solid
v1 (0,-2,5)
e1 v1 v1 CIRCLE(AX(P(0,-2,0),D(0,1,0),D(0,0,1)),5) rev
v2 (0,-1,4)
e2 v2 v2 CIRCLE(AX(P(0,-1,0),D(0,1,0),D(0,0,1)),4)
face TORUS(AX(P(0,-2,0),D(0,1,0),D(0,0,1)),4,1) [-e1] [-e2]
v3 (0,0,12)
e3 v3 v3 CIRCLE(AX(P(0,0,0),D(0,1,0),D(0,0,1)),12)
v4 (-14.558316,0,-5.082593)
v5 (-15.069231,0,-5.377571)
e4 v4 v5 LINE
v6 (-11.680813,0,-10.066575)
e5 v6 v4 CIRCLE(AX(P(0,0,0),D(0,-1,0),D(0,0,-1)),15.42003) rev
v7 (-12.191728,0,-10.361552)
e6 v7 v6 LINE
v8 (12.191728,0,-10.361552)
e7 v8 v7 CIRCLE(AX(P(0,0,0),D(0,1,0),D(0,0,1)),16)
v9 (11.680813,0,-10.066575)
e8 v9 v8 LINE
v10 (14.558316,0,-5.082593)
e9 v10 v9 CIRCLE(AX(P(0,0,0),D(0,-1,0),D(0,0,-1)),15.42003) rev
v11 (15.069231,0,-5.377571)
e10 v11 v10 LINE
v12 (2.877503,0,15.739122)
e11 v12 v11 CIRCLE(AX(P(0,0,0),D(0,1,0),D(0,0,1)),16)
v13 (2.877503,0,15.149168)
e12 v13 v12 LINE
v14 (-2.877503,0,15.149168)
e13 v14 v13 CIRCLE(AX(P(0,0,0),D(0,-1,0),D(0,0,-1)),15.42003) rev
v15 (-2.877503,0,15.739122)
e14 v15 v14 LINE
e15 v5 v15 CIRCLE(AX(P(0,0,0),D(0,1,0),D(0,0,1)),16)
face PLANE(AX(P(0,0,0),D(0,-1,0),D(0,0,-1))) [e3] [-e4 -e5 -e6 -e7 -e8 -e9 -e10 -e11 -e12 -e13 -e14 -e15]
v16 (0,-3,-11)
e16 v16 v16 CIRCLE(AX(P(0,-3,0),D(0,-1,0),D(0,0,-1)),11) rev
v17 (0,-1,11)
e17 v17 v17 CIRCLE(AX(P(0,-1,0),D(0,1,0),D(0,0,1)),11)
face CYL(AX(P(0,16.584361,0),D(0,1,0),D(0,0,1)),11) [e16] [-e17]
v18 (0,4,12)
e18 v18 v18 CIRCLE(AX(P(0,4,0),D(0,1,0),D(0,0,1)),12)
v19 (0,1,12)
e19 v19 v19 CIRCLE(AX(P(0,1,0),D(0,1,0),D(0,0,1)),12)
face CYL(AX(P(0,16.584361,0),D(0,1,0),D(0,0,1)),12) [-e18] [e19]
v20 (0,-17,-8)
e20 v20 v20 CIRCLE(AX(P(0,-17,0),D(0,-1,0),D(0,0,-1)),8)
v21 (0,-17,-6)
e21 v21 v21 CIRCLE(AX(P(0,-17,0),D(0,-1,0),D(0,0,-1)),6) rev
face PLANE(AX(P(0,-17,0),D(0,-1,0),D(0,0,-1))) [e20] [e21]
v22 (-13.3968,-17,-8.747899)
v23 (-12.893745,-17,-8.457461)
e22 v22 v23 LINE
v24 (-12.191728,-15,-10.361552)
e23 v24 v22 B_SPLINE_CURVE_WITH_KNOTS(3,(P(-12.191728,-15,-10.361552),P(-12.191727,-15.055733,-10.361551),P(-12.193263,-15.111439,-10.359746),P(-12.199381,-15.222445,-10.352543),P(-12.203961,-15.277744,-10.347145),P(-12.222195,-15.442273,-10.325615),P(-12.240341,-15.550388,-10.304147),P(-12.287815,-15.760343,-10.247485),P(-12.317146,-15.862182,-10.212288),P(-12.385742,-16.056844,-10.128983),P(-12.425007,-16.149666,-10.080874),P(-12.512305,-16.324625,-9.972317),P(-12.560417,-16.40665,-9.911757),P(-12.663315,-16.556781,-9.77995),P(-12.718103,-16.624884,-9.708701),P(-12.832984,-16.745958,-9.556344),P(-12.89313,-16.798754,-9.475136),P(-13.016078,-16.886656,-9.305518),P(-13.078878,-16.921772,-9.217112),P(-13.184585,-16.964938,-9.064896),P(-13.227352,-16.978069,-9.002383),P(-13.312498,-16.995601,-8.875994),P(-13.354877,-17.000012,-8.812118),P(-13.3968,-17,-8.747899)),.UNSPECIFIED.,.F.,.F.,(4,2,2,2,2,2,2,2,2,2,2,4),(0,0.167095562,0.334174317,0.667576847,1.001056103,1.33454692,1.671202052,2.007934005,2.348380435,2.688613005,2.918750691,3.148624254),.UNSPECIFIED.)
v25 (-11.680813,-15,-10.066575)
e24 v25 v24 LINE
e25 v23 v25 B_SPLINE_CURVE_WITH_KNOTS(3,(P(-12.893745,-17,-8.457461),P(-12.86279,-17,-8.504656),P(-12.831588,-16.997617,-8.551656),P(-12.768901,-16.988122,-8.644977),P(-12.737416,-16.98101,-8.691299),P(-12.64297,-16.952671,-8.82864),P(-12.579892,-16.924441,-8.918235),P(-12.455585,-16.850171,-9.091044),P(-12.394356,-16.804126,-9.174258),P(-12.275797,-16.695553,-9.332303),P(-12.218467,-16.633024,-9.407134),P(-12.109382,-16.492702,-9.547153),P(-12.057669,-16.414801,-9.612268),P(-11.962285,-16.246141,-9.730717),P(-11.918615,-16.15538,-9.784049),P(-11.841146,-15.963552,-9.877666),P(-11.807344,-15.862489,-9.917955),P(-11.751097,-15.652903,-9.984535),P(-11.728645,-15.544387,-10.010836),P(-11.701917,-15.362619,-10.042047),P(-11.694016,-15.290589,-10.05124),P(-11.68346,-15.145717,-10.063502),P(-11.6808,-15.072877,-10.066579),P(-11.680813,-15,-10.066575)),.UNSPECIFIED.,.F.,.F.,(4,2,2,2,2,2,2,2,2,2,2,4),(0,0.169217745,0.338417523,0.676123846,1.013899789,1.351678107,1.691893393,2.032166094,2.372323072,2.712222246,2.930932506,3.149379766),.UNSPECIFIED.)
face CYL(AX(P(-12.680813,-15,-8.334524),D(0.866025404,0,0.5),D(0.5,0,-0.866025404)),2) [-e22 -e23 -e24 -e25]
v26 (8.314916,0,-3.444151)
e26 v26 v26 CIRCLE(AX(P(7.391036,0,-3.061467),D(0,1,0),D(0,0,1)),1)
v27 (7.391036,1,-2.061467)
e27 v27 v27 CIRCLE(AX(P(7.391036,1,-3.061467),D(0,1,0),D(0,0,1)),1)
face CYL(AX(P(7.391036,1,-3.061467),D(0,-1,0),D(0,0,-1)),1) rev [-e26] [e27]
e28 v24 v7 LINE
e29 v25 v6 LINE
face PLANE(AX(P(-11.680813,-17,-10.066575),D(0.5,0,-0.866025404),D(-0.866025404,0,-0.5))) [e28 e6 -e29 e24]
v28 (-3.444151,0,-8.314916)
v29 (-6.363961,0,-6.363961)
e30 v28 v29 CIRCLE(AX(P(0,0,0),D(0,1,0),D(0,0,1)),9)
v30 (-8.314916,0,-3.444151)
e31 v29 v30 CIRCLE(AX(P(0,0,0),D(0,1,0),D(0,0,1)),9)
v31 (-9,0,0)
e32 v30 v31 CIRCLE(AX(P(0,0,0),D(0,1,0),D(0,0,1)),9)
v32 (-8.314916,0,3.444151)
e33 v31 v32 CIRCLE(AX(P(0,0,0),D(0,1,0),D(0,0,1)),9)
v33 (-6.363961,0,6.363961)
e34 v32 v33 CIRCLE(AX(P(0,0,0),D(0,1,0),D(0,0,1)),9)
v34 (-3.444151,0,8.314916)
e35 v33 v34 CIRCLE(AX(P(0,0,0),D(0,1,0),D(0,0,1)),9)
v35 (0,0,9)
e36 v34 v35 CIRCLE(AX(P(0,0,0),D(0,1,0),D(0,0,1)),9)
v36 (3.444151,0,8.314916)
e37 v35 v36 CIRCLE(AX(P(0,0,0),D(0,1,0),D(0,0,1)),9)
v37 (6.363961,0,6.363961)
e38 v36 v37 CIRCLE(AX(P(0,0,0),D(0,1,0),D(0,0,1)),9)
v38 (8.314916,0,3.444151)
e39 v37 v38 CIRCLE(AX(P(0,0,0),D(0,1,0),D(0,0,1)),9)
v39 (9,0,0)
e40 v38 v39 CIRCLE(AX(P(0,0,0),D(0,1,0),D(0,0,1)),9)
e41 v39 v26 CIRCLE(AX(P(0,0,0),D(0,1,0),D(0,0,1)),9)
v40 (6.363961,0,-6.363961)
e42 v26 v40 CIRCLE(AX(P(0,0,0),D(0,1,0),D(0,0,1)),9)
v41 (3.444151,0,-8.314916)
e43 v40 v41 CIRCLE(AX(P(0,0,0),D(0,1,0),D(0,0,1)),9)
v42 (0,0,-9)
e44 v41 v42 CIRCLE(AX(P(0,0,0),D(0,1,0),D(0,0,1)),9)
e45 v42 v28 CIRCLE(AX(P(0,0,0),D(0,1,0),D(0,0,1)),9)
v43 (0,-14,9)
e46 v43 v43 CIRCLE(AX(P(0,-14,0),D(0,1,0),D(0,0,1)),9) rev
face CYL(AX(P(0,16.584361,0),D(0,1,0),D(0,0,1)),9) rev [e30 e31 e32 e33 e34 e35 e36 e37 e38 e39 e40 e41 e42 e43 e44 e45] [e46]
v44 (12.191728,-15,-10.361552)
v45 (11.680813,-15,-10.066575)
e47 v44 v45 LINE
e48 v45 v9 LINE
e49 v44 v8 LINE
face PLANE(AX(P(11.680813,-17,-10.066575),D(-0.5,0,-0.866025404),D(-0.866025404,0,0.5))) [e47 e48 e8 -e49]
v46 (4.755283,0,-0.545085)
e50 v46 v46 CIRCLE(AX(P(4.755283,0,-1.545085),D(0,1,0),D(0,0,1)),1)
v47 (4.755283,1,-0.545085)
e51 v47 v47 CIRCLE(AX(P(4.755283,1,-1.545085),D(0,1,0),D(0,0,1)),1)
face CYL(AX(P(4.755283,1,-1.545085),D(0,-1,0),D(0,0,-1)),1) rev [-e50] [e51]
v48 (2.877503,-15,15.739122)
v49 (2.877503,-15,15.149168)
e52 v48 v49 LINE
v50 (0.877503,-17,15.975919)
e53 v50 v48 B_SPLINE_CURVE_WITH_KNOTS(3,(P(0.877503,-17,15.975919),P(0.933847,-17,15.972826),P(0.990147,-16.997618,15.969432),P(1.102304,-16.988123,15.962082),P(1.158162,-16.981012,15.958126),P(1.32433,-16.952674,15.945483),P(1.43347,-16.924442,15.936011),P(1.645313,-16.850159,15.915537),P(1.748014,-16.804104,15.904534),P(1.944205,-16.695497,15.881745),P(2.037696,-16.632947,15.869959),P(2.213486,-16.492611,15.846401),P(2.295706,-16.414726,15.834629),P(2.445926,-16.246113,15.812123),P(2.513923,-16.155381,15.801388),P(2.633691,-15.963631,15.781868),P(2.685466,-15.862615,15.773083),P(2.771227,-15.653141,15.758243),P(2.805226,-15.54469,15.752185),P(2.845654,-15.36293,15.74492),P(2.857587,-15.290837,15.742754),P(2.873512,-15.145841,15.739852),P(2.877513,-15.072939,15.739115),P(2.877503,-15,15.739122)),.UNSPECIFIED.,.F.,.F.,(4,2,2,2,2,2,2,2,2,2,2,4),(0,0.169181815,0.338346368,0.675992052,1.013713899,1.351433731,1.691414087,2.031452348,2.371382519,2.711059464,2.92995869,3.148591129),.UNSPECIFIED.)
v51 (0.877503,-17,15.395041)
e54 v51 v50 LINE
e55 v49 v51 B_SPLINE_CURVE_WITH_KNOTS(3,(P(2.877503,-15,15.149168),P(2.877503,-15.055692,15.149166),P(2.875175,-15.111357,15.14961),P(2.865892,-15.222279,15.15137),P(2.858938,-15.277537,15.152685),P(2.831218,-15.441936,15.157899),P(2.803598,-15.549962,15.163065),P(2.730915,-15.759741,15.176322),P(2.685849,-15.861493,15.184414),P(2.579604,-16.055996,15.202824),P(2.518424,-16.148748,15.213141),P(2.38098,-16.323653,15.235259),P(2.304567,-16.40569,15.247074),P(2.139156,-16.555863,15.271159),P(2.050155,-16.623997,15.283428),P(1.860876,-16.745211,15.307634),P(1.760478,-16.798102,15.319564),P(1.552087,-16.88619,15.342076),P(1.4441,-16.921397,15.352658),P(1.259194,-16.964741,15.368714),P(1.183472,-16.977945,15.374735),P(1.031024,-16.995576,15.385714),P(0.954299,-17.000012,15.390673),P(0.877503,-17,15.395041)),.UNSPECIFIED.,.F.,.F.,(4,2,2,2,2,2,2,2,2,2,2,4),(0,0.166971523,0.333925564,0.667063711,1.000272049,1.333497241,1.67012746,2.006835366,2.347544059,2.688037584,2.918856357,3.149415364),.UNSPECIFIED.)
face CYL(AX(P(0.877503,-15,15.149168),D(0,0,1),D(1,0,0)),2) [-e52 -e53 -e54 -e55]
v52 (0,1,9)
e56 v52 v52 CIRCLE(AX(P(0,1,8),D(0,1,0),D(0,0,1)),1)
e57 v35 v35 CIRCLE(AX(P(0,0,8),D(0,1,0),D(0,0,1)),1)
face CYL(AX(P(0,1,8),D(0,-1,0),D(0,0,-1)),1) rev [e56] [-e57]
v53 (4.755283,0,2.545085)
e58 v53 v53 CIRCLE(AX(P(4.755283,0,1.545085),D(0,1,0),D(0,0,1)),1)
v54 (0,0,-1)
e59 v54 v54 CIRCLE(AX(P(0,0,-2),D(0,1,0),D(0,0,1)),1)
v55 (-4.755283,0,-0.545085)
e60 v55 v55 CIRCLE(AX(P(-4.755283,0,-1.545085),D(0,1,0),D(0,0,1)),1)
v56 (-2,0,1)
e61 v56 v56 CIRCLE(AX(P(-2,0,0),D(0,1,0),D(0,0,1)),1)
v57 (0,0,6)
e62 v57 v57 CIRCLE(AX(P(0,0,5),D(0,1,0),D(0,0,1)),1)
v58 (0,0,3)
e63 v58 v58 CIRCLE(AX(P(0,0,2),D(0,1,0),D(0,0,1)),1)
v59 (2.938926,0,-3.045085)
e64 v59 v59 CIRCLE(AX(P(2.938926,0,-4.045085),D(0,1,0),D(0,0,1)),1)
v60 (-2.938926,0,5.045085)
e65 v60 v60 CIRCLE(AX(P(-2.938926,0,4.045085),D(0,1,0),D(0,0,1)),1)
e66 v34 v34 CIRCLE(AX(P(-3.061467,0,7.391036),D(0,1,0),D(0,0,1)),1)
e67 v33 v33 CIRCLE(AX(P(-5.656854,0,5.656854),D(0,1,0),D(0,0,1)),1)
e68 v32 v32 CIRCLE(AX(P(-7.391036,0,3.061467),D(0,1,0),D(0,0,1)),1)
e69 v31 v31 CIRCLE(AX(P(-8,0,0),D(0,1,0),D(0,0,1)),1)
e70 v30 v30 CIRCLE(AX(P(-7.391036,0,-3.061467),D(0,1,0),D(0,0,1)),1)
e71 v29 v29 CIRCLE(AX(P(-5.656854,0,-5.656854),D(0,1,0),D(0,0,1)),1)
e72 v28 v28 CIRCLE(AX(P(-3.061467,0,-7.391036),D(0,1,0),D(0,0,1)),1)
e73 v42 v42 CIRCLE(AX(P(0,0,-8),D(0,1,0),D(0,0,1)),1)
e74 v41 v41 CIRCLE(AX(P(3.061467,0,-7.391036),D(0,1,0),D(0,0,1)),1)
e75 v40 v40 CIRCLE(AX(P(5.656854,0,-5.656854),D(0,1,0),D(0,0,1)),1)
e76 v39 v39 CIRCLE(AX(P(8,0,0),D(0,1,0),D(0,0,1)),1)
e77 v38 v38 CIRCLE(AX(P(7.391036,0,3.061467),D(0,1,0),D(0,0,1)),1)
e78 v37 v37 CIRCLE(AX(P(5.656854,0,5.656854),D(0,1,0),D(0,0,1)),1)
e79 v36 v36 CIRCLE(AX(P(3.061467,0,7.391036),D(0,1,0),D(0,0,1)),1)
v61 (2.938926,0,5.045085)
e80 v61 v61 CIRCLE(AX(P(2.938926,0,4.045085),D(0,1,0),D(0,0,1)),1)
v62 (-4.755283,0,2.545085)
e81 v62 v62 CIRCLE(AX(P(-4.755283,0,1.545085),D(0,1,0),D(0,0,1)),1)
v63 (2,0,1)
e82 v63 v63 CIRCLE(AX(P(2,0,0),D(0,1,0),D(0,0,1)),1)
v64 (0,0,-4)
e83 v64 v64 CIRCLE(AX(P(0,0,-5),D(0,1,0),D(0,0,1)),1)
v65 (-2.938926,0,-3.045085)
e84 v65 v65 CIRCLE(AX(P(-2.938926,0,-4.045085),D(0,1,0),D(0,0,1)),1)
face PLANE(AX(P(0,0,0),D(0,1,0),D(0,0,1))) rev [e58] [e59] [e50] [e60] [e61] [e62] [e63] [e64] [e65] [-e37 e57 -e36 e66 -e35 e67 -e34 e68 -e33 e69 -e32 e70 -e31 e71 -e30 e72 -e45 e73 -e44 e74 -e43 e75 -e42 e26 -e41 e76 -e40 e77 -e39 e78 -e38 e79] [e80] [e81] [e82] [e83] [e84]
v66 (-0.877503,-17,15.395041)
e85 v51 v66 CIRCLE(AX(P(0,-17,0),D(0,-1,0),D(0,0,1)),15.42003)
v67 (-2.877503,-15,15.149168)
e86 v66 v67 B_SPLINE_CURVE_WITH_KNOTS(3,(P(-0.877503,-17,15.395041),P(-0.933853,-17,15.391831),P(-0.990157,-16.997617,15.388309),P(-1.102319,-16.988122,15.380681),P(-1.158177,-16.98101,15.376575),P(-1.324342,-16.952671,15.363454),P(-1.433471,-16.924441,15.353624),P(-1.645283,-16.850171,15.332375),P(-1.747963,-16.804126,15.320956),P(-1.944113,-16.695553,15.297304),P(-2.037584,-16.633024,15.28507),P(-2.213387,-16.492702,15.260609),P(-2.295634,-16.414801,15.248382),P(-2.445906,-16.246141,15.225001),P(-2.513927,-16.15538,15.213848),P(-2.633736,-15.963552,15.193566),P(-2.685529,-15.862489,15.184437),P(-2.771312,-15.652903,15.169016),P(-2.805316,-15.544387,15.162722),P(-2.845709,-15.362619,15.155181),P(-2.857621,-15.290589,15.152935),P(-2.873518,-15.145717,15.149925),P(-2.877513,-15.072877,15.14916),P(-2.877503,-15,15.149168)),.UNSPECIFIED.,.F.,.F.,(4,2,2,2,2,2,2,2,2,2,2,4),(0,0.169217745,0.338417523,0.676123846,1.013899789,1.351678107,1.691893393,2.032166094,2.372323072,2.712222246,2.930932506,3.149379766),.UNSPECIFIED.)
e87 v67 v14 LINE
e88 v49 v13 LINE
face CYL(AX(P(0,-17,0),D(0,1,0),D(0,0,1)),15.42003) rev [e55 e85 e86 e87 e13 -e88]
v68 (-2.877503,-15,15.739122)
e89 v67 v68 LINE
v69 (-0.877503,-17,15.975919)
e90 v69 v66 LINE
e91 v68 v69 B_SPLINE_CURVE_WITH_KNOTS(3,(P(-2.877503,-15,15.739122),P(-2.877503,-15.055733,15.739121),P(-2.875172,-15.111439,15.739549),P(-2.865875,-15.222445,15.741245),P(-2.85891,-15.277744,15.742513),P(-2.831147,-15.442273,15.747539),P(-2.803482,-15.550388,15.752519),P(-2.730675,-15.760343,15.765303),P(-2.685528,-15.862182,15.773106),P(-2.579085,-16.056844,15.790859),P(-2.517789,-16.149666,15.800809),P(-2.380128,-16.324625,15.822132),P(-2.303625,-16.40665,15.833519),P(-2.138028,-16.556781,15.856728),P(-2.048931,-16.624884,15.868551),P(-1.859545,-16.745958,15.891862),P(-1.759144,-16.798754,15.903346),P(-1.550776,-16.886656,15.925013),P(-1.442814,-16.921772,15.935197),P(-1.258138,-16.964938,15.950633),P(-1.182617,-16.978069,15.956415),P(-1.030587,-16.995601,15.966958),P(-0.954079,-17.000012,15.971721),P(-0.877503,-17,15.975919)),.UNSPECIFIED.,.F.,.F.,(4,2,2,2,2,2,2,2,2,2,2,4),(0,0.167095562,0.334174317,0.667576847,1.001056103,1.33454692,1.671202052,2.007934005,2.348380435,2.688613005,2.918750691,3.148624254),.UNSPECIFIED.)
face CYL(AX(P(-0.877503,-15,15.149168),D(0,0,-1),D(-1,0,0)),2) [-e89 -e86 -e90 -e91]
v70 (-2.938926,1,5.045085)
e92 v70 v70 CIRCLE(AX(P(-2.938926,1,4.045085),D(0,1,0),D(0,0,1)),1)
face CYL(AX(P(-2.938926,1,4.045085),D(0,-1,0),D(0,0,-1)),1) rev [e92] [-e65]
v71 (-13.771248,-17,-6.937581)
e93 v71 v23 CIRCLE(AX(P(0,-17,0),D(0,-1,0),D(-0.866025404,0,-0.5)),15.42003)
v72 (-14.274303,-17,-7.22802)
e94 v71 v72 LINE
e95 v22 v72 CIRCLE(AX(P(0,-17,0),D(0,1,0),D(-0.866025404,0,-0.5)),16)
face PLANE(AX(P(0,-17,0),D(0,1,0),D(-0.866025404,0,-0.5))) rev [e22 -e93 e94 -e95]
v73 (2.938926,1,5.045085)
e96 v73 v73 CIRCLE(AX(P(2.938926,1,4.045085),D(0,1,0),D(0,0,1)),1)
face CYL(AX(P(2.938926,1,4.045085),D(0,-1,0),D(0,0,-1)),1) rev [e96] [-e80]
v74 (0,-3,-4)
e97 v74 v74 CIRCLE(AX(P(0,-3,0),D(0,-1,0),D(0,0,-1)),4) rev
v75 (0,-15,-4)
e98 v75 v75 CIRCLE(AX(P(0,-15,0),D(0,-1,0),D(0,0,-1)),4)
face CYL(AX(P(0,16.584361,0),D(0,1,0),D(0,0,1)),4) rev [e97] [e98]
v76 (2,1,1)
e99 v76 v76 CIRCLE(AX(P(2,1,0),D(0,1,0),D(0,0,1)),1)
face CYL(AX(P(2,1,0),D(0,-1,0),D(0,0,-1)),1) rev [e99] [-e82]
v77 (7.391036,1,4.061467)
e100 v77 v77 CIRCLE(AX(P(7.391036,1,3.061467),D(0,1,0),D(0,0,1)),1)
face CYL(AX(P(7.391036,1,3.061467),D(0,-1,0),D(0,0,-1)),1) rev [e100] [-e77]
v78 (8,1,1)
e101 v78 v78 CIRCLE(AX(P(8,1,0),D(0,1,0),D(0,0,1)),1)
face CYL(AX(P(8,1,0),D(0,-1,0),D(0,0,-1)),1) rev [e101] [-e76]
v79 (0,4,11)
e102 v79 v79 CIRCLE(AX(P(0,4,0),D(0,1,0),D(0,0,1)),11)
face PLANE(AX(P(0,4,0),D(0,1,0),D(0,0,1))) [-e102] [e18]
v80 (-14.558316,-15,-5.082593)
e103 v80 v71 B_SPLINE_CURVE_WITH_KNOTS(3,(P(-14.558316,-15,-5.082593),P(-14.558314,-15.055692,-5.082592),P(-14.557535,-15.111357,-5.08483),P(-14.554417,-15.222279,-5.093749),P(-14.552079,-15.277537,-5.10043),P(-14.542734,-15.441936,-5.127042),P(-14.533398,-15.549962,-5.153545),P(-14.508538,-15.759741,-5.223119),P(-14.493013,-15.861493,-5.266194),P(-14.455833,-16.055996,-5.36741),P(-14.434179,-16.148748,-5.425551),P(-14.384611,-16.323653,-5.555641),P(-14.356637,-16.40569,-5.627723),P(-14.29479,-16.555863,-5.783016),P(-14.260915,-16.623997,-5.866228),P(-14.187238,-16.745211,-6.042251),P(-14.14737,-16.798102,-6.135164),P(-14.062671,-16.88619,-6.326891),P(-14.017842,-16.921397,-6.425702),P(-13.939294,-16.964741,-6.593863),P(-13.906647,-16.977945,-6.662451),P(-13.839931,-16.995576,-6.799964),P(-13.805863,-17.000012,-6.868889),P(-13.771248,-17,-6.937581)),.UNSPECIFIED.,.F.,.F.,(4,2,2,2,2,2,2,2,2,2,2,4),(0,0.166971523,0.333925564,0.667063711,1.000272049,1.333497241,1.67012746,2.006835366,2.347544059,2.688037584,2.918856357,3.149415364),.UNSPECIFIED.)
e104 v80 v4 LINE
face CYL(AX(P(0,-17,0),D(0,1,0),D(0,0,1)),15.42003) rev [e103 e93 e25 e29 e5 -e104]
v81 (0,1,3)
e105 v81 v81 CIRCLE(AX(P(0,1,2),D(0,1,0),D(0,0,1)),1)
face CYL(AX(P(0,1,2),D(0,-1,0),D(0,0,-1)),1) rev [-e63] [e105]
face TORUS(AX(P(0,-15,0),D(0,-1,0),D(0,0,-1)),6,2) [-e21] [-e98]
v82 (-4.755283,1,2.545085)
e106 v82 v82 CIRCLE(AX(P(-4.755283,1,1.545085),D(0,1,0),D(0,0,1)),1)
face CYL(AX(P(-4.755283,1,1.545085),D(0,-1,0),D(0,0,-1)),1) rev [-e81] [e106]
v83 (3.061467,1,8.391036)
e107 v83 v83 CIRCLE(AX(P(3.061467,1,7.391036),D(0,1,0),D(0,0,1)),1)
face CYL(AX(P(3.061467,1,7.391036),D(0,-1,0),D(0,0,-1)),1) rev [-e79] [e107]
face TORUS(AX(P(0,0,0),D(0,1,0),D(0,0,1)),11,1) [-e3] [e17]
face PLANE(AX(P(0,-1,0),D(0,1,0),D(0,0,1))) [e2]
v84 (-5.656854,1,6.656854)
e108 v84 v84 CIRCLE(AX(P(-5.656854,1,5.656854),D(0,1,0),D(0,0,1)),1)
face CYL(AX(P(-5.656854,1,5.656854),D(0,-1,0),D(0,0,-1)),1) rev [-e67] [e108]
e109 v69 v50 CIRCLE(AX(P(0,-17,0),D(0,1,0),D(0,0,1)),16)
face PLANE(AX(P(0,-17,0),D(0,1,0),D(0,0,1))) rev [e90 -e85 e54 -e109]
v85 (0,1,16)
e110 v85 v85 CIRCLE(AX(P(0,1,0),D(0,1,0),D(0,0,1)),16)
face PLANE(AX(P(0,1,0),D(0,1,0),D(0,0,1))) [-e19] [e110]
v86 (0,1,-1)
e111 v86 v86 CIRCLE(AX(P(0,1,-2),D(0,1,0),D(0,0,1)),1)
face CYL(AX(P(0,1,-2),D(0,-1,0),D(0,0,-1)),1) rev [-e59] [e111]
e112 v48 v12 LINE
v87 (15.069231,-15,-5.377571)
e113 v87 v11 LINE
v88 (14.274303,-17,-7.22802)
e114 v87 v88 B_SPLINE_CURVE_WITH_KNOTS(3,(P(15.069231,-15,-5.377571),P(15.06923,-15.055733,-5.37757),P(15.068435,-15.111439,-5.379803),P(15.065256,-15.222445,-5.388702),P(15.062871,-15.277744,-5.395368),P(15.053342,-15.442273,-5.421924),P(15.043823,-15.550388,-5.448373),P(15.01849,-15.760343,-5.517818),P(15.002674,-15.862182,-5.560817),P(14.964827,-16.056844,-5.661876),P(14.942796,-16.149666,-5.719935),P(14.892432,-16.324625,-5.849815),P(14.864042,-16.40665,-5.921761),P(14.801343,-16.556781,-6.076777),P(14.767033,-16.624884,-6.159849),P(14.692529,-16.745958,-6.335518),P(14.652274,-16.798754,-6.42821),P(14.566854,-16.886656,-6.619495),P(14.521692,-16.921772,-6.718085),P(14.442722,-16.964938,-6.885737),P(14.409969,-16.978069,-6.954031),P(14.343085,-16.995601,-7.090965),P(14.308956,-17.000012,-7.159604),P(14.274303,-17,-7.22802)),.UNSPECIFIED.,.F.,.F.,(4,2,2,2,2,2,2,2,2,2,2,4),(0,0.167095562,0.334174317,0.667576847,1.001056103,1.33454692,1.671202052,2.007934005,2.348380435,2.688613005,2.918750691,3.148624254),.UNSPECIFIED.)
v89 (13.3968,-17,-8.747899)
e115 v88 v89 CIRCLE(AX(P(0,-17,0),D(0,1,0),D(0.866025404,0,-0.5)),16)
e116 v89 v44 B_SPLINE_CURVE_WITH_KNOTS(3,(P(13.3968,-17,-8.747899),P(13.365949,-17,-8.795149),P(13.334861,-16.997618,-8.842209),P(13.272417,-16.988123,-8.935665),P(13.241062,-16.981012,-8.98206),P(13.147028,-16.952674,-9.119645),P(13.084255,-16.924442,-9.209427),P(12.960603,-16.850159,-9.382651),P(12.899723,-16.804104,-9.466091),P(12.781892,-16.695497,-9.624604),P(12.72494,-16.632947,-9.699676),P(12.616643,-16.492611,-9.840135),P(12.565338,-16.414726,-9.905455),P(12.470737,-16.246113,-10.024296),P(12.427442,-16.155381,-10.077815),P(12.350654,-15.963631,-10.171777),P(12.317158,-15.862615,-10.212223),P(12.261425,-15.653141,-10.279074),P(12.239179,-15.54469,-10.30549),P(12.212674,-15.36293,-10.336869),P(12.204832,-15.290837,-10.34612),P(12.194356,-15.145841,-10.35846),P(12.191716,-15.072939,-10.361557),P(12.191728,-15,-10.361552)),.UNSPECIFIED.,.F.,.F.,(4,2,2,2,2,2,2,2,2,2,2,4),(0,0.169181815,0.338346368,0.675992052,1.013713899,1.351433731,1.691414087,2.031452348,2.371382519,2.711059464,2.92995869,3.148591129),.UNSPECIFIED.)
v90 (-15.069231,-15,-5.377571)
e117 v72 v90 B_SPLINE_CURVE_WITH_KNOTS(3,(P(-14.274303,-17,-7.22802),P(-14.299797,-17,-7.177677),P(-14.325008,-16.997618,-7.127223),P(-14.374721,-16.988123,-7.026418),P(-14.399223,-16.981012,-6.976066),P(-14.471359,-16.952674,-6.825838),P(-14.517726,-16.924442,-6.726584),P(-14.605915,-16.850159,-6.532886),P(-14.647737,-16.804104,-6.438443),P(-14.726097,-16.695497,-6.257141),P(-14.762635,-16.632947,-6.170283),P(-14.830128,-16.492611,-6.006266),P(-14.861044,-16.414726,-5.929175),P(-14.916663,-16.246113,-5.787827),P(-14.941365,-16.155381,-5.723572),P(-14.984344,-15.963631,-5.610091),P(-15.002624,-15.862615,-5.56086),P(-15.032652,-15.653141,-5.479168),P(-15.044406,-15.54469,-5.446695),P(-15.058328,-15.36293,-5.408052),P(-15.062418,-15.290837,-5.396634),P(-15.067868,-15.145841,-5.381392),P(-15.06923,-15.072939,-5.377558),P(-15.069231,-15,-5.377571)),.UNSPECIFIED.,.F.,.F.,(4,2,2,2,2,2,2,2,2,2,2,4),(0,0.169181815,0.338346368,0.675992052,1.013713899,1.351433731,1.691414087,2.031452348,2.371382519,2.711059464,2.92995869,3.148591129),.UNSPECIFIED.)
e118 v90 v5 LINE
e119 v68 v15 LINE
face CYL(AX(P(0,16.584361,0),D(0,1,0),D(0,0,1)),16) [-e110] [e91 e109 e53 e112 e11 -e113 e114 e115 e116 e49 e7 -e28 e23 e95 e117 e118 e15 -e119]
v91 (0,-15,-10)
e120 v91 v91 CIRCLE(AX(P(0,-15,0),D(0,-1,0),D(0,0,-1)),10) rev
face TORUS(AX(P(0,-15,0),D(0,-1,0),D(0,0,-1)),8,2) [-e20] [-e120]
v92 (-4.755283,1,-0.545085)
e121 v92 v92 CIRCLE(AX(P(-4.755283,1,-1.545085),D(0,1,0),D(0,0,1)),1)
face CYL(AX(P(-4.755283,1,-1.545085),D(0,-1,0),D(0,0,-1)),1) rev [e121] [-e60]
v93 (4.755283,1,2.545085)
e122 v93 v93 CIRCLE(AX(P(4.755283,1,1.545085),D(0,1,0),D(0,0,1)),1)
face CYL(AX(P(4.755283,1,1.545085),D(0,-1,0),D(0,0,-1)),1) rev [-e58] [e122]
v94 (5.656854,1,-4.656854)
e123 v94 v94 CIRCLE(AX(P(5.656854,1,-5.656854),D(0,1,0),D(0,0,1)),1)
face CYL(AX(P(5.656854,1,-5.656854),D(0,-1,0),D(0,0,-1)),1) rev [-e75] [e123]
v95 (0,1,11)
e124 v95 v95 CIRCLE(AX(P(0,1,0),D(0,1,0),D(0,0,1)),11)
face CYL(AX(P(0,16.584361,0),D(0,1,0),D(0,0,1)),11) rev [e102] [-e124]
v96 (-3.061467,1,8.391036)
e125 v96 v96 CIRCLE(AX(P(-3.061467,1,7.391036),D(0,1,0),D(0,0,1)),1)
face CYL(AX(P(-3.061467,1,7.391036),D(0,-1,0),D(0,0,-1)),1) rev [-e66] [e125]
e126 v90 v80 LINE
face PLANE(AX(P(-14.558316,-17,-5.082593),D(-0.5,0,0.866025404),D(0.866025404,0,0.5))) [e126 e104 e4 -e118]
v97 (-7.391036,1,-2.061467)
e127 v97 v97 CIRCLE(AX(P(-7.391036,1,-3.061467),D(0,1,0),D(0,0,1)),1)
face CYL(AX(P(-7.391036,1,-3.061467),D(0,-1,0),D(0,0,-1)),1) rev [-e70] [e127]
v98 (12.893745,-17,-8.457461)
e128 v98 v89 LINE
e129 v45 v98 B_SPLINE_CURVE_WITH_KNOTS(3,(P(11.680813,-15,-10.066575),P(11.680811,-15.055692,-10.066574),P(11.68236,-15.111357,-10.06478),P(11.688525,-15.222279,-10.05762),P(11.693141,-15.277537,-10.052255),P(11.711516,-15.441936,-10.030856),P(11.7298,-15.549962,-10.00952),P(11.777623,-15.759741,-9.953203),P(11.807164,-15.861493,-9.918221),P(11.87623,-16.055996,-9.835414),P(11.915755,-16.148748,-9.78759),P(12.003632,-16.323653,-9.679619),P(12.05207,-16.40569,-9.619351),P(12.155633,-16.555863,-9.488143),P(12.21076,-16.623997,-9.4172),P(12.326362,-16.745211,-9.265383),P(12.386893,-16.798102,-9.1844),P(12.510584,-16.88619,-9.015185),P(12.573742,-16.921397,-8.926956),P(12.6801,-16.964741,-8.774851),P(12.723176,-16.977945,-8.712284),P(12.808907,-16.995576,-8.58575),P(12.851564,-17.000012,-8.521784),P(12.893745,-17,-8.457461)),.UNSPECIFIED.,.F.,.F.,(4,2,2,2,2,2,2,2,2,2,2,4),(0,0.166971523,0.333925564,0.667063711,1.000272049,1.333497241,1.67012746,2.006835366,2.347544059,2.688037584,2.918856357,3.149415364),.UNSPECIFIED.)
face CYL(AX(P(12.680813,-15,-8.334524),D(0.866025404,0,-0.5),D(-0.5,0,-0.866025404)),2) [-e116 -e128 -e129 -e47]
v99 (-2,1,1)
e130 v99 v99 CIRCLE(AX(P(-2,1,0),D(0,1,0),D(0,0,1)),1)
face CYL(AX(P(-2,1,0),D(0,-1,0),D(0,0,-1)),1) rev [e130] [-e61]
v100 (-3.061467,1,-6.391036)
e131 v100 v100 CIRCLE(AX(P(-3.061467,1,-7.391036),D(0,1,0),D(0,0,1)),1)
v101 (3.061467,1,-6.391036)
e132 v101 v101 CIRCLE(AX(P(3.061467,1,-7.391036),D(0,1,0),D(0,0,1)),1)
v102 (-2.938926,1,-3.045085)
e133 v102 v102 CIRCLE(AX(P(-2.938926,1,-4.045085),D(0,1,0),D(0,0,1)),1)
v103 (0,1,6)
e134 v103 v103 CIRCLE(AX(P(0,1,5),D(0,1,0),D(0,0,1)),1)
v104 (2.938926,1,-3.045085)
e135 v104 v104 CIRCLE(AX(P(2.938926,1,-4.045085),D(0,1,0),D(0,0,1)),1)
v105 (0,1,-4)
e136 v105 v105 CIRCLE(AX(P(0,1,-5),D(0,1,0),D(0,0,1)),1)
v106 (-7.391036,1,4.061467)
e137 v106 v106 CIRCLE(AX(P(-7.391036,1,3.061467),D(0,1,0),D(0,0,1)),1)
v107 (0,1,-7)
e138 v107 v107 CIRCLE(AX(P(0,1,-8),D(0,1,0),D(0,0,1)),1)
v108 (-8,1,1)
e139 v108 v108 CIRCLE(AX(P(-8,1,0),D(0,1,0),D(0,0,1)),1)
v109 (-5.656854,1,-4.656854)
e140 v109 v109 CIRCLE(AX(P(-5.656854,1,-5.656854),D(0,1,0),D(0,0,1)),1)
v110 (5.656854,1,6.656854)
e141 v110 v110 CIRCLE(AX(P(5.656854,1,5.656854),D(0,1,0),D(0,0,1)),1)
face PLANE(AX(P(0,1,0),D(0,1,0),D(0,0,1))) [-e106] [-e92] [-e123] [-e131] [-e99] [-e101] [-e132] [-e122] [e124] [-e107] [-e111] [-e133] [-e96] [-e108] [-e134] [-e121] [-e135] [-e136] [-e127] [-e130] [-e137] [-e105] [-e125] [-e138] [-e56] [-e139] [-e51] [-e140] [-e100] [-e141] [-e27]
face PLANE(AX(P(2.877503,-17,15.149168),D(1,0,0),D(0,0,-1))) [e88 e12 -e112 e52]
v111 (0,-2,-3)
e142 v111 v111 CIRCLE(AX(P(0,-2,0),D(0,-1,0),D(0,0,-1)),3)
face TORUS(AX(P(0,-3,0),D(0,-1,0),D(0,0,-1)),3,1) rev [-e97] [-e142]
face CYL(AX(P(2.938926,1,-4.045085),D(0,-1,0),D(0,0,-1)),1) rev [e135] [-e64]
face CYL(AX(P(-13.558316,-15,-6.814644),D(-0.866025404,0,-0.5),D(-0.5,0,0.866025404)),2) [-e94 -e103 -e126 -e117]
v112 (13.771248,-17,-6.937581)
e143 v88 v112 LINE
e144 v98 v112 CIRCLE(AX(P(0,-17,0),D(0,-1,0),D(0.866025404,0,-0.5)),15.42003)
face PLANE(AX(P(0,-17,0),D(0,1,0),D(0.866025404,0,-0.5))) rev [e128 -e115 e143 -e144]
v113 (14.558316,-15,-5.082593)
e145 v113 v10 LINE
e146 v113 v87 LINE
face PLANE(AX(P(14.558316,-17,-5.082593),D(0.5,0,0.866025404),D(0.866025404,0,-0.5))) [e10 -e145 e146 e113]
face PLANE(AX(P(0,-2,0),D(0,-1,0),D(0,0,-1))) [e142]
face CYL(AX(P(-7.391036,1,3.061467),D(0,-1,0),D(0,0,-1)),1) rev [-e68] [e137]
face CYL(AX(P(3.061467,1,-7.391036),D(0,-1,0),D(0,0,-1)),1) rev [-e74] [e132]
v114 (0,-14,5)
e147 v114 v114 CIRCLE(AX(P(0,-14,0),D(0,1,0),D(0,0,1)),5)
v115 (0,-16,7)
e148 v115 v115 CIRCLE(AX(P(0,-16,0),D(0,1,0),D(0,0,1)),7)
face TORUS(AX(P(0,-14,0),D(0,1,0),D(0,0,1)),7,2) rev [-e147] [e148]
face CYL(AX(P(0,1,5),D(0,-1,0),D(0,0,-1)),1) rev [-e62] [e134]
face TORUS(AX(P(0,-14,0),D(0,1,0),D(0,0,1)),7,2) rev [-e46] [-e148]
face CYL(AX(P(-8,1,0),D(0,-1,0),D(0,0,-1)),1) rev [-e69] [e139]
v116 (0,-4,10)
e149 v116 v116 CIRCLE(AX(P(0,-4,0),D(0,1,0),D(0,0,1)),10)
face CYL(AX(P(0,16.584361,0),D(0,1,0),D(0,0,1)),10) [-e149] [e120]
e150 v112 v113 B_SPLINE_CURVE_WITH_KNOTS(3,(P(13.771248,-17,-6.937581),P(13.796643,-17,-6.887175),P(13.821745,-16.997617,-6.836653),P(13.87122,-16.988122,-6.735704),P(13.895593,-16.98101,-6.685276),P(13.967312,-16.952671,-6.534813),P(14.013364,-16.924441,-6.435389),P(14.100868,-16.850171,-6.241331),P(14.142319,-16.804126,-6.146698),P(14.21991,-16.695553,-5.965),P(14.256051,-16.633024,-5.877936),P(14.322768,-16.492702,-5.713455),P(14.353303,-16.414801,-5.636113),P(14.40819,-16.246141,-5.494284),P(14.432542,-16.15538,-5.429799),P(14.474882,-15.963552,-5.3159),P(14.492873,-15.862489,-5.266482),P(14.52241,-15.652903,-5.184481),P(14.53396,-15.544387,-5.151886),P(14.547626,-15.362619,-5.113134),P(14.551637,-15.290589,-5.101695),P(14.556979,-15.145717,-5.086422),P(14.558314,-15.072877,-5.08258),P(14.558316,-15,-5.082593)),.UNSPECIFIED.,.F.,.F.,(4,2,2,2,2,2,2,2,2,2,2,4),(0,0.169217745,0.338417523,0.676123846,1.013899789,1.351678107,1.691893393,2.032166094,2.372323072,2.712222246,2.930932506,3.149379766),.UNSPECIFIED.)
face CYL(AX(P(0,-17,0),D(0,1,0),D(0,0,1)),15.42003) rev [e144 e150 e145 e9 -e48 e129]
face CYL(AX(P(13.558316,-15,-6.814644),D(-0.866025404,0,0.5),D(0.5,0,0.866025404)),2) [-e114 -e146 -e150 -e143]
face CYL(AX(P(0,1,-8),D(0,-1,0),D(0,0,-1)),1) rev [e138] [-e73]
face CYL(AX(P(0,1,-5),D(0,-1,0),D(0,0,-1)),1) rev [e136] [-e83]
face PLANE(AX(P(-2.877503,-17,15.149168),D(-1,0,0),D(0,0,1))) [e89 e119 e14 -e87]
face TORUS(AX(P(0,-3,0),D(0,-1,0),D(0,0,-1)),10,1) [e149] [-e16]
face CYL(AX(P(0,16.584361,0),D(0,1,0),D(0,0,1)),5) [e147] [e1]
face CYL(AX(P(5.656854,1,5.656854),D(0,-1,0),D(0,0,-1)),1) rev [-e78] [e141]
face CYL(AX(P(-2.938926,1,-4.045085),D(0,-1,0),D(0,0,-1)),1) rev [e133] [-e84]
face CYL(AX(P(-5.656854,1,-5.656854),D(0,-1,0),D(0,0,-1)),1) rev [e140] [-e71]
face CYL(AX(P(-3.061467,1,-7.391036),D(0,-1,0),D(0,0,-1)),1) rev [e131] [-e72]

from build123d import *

# Parameters (mm, degrees)
FILLET1_R           = 1
FILLET2_R           = 2
BOSS_EXTRUDE3_DEPTH = 18
SKETCH11_R          = 11
SKETCH11_R_2        = 1
BOSS_EXTRUDE4_DEPTH = 1
CIRPATTERN1_COUNT   = 3
FILLET3_R           = 2


with BuildPart() as part:
    # Sketch1 → Revolve2 (revolve)
    with BuildSketch(Plane.XY, mode=Mode.PRIVATE) as revolve2_sk:
        with BuildLine():
            Line((12, 0), (16, 0))
            Line((16, 0), (16, 1))
            Line((16, 1), (12, 1))
            Line((12, 1), (12, 4))
            Line((12, 4), (11, 4))
            Line((11, 4), (11, 1))
            Line((11, 1), (11, 0))
            Line((11, 0), (9, 0))
            Line((9, 0), (9, -4))
            Line((9, -4), (9, -16))
            Line((9, -16), (5, -16))
            Line((5, -16), (5, -1))
            Line((5, -1), (0, -1))
            Line((0, -1), (0, -2))
            Line((0, -2), (4, -2))
            Line((4, -2), (4, -17))
            Line((4, -17), (10, -17))
            Line((10, -17), (10, -4))
            Line((10, -4), (11, -4))
            Line((11, -4), (11, -1))
            ThreePointArc((11, -1), (11.707107, -0.707107), (12, 0))
        make_face()
    revolve(revolve2_sk.sketch.rotate(Axis((0, 16.584361, 0), (0, -1, 0)), 90), axis=Axis((0, 16.584361, 0), (0, -1, 0)))

    # Fillet1
    fillet1_edges = [part.edges().sort_by_distance(p)[0] for p in [
        (0, -4, -11),
        (0, -2, -4),
        (0, -1, -5),
    ]]
    fillet(fillet1_edges, radius=FILLET1_R - 0.0001)  # a hair under: the kernel refuses the full size

    # Fillet2
    fillet2_edges = [part.edges().sort_by_distance(p)[0] for p in [
        (0, -16, -5),
        (0, -16, -9),
    ]]
    fillet(fillet2_edges, radius=FILLET2_R - 0.0001)  # a hair under: the kernel refuses the full size
    fillet2_2_edges = [part.edges().sort_by_distance(p)[0] for p in [
        (0, -17, -10),
        (0, -17, -4),
    ]]
    fillet(fillet2_2_edges, radius=FILLET2_R)

    # Sketch2 → Boss-Extrude3 (add)
    with BuildSketch(Plane(origin=(0, 1, 0), x_dir=(1, 0, 0), z_dir=(0, 1, 0))):
        with BuildLine():
            Line((-2.877503, -15.149168), (-2.877503, -15.739122))
            ThreePointArc((-2.877503, -15.739122), (0, -16), (2.877503, -15.739122))
            Line((2.877503, -15.739122), (2.877503, -15.149168))
            ThreePointArc((2.877503, -15.149168), (0, -15.42003), (-2.877503, -15.149168))
        make_face()
    boss_extrude3 = extrude(amount=-BOSS_EXTRUDE3_DEPTH)

    # Sketch11 → Boss-Extrude4 (add)
    with BuildSketch(Plane(origin=(0, 0, 0), x_dir=(1, 0, 0), z_dir=(0, 1, 0))):
        with Locations(Location((0, 0, 0), (0, 0, 270))):
            Circle(SKETCH11_R)
        with Locations(Location((0, -2, 0), (0, 0, 270))):
            Circle(SKETCH11_R_2, mode=Mode.SUBTRACT)
        with Locations(Location((0, -5, 0), (0, 0, 270))):
            Circle(SKETCH11_R_2, mode=Mode.SUBTRACT)
        with Locations(Location((0, -8, 0), (0, 0, 269.999141))):
            Circle(SKETCH11_R_2, mode=Mode.SUBTRACT)
        with Locations(Location((-2, 0, 0), (0, 0, 270))):
            Circle(SKETCH11_R_2, mode=Mode.SUBTRACT)
        with Locations(Location((0, 2, 0), (0, 0, 270))):
            Circle(SKETCH11_R_2, mode=Mode.SUBTRACT)
        with Locations(Location((2, 0, 0), (0, 0, 270))):
            Circle(SKETCH11_R_2, mode=Mode.SUBTRACT)
        with Locations(Location((-2.938926, -4.045085, 0), (0, 0, 270))):
            Circle(SKETCH11_R_2, mode=Mode.SUBTRACT)
        with Locations(Location((-4.755283, -1.545085, 0), (0, 0, 270))):
            Circle(SKETCH11_R_2, mode=Mode.SUBTRACT)
        with Locations(Location((-4.755283, 1.545085, 0), (0, 0, 270))):
            Circle(SKETCH11_R_2, mode=Mode.SUBTRACT)
        with Locations(Location((-2.938926, 4.045085, 0), (0, 0, 270))):
            Circle(SKETCH11_R_2, mode=Mode.SUBTRACT)
        with Locations(Location((0, 5, 0), (0, 0, 270))):
            Circle(SKETCH11_R_2, mode=Mode.SUBTRACT)
        with Locations(Location((2.938926, 4.045085, 0), (0, 0, 270))):
            Circle(SKETCH11_R_2, mode=Mode.SUBTRACT)
        with Locations(Location((4.755283, 1.545085, 0), (0, 0, 270))):
            Circle(SKETCH11_R_2, mode=Mode.SUBTRACT)
        with Locations(Location((4.755283, -1.545085, 0), (0, 0, 270))):
            Circle(SKETCH11_R_2, mode=Mode.SUBTRACT)
        with Locations(Location((2.938926, -4.045085, 0), (0, 0, 270))):
            Circle(SKETCH11_R_2, mode=Mode.SUBTRACT)
        with Locations(Location((-3.061467, -7.391036, 0), (0, 0, 247.499141))):
            Circle(SKETCH11_R_2, mode=Mode.SUBTRACT)
        with Locations(Location((-5.656854, -5.656854, 0), (0, 0, 224.999141))):
            Circle(SKETCH11_R_2, mode=Mode.SUBTRACT)
        with Locations(Location((-7.391036, -3.061467, 0), (0, 0, 202.499141))):
            Circle(SKETCH11_R_2, mode=Mode.SUBTRACT)
        with Locations(Location((-8, 0, 0), (0, 0, 179.999141))):
            Circle(SKETCH11_R_2, mode=Mode.SUBTRACT)
        with Locations(Location((-7.391036, 3.061467, 0), (0, 0, 157.499141))):
            Circle(SKETCH11_R_2, mode=Mode.SUBTRACT)
        with Locations(Location((-5.656854, 5.656854, 0), (0, 0, 134.999141))):
            Circle(SKETCH11_R_2, mode=Mode.SUBTRACT)
        with Locations(Location((-3.061467, 7.391036, 0), (0, 0, 112.499141))):
            Circle(SKETCH11_R_2, mode=Mode.SUBTRACT)
        with Locations(Location((0, 8, 0), (0, 0, 89.999141))):
            Circle(SKETCH11_R_2, mode=Mode.SUBTRACT)
        with Locations(Location((3.061467, 7.391036, 0), (0, 0, 67.499141))):
            Circle(SKETCH11_R_2, mode=Mode.SUBTRACT)
        with Locations(Location((5.656854, 5.656854, 0), (0, 0, 44.999141))):
            Circle(SKETCH11_R_2, mode=Mode.SUBTRACT)
        with Locations(Location((7.391036, 3.061467, 0), (0, 0, 22.499141))):
            Circle(SKETCH11_R_2, mode=Mode.SUBTRACT)
        with Locations(Location((8, 0, 0), (0, 0, 359.999141))):
            Circle(SKETCH11_R_2, mode=Mode.SUBTRACT)
        with Locations(Location((7.391036, -3.061467, 0), (0, 0, 337.499141))):
            Circle(SKETCH11_R_2, mode=Mode.SUBTRACT)
        with Locations(Location((5.656854, -5.656854, 0), (0, 0, 314.999141))):
            Circle(SKETCH11_R_2, mode=Mode.SUBTRACT)
        with Locations(Location((3.061467, -7.391036, 0), (0, 0, 292.499141))):
            Circle(SKETCH11_R_2, mode=Mode.SUBTRACT)
    extrude(amount=BOSS_EXTRUDE4_DEPTH)

    # CirPattern1: Boss-Extrude3 ×3 about axis
    cirpattern1_axis = Axis((0, 0, 0), (0, 1, 0))
    for i in range(1, CIRPATTERN1_COUNT):
        add(boss_extrude3.rotate(cirpattern1_axis, i * 360 / CIRPATTERN1_COUNT))

    # Fillet3
    fillet3_edges = [part.edges().sort_by_distance(p)[0] for p in [
        (11.936271, -17, -10.214063),
        (14.813774, -17, -5.230082),
        (-14.813774, -17, -5.230082),
        (-11.936271, -17, -10.214063),
        (2.877503, -17, 15.444145),
        (-2.877503, -17, 15.444145),
    ]]
    fillet(fillet3_edges, radius=FILLET3_R)


solid = part.part
